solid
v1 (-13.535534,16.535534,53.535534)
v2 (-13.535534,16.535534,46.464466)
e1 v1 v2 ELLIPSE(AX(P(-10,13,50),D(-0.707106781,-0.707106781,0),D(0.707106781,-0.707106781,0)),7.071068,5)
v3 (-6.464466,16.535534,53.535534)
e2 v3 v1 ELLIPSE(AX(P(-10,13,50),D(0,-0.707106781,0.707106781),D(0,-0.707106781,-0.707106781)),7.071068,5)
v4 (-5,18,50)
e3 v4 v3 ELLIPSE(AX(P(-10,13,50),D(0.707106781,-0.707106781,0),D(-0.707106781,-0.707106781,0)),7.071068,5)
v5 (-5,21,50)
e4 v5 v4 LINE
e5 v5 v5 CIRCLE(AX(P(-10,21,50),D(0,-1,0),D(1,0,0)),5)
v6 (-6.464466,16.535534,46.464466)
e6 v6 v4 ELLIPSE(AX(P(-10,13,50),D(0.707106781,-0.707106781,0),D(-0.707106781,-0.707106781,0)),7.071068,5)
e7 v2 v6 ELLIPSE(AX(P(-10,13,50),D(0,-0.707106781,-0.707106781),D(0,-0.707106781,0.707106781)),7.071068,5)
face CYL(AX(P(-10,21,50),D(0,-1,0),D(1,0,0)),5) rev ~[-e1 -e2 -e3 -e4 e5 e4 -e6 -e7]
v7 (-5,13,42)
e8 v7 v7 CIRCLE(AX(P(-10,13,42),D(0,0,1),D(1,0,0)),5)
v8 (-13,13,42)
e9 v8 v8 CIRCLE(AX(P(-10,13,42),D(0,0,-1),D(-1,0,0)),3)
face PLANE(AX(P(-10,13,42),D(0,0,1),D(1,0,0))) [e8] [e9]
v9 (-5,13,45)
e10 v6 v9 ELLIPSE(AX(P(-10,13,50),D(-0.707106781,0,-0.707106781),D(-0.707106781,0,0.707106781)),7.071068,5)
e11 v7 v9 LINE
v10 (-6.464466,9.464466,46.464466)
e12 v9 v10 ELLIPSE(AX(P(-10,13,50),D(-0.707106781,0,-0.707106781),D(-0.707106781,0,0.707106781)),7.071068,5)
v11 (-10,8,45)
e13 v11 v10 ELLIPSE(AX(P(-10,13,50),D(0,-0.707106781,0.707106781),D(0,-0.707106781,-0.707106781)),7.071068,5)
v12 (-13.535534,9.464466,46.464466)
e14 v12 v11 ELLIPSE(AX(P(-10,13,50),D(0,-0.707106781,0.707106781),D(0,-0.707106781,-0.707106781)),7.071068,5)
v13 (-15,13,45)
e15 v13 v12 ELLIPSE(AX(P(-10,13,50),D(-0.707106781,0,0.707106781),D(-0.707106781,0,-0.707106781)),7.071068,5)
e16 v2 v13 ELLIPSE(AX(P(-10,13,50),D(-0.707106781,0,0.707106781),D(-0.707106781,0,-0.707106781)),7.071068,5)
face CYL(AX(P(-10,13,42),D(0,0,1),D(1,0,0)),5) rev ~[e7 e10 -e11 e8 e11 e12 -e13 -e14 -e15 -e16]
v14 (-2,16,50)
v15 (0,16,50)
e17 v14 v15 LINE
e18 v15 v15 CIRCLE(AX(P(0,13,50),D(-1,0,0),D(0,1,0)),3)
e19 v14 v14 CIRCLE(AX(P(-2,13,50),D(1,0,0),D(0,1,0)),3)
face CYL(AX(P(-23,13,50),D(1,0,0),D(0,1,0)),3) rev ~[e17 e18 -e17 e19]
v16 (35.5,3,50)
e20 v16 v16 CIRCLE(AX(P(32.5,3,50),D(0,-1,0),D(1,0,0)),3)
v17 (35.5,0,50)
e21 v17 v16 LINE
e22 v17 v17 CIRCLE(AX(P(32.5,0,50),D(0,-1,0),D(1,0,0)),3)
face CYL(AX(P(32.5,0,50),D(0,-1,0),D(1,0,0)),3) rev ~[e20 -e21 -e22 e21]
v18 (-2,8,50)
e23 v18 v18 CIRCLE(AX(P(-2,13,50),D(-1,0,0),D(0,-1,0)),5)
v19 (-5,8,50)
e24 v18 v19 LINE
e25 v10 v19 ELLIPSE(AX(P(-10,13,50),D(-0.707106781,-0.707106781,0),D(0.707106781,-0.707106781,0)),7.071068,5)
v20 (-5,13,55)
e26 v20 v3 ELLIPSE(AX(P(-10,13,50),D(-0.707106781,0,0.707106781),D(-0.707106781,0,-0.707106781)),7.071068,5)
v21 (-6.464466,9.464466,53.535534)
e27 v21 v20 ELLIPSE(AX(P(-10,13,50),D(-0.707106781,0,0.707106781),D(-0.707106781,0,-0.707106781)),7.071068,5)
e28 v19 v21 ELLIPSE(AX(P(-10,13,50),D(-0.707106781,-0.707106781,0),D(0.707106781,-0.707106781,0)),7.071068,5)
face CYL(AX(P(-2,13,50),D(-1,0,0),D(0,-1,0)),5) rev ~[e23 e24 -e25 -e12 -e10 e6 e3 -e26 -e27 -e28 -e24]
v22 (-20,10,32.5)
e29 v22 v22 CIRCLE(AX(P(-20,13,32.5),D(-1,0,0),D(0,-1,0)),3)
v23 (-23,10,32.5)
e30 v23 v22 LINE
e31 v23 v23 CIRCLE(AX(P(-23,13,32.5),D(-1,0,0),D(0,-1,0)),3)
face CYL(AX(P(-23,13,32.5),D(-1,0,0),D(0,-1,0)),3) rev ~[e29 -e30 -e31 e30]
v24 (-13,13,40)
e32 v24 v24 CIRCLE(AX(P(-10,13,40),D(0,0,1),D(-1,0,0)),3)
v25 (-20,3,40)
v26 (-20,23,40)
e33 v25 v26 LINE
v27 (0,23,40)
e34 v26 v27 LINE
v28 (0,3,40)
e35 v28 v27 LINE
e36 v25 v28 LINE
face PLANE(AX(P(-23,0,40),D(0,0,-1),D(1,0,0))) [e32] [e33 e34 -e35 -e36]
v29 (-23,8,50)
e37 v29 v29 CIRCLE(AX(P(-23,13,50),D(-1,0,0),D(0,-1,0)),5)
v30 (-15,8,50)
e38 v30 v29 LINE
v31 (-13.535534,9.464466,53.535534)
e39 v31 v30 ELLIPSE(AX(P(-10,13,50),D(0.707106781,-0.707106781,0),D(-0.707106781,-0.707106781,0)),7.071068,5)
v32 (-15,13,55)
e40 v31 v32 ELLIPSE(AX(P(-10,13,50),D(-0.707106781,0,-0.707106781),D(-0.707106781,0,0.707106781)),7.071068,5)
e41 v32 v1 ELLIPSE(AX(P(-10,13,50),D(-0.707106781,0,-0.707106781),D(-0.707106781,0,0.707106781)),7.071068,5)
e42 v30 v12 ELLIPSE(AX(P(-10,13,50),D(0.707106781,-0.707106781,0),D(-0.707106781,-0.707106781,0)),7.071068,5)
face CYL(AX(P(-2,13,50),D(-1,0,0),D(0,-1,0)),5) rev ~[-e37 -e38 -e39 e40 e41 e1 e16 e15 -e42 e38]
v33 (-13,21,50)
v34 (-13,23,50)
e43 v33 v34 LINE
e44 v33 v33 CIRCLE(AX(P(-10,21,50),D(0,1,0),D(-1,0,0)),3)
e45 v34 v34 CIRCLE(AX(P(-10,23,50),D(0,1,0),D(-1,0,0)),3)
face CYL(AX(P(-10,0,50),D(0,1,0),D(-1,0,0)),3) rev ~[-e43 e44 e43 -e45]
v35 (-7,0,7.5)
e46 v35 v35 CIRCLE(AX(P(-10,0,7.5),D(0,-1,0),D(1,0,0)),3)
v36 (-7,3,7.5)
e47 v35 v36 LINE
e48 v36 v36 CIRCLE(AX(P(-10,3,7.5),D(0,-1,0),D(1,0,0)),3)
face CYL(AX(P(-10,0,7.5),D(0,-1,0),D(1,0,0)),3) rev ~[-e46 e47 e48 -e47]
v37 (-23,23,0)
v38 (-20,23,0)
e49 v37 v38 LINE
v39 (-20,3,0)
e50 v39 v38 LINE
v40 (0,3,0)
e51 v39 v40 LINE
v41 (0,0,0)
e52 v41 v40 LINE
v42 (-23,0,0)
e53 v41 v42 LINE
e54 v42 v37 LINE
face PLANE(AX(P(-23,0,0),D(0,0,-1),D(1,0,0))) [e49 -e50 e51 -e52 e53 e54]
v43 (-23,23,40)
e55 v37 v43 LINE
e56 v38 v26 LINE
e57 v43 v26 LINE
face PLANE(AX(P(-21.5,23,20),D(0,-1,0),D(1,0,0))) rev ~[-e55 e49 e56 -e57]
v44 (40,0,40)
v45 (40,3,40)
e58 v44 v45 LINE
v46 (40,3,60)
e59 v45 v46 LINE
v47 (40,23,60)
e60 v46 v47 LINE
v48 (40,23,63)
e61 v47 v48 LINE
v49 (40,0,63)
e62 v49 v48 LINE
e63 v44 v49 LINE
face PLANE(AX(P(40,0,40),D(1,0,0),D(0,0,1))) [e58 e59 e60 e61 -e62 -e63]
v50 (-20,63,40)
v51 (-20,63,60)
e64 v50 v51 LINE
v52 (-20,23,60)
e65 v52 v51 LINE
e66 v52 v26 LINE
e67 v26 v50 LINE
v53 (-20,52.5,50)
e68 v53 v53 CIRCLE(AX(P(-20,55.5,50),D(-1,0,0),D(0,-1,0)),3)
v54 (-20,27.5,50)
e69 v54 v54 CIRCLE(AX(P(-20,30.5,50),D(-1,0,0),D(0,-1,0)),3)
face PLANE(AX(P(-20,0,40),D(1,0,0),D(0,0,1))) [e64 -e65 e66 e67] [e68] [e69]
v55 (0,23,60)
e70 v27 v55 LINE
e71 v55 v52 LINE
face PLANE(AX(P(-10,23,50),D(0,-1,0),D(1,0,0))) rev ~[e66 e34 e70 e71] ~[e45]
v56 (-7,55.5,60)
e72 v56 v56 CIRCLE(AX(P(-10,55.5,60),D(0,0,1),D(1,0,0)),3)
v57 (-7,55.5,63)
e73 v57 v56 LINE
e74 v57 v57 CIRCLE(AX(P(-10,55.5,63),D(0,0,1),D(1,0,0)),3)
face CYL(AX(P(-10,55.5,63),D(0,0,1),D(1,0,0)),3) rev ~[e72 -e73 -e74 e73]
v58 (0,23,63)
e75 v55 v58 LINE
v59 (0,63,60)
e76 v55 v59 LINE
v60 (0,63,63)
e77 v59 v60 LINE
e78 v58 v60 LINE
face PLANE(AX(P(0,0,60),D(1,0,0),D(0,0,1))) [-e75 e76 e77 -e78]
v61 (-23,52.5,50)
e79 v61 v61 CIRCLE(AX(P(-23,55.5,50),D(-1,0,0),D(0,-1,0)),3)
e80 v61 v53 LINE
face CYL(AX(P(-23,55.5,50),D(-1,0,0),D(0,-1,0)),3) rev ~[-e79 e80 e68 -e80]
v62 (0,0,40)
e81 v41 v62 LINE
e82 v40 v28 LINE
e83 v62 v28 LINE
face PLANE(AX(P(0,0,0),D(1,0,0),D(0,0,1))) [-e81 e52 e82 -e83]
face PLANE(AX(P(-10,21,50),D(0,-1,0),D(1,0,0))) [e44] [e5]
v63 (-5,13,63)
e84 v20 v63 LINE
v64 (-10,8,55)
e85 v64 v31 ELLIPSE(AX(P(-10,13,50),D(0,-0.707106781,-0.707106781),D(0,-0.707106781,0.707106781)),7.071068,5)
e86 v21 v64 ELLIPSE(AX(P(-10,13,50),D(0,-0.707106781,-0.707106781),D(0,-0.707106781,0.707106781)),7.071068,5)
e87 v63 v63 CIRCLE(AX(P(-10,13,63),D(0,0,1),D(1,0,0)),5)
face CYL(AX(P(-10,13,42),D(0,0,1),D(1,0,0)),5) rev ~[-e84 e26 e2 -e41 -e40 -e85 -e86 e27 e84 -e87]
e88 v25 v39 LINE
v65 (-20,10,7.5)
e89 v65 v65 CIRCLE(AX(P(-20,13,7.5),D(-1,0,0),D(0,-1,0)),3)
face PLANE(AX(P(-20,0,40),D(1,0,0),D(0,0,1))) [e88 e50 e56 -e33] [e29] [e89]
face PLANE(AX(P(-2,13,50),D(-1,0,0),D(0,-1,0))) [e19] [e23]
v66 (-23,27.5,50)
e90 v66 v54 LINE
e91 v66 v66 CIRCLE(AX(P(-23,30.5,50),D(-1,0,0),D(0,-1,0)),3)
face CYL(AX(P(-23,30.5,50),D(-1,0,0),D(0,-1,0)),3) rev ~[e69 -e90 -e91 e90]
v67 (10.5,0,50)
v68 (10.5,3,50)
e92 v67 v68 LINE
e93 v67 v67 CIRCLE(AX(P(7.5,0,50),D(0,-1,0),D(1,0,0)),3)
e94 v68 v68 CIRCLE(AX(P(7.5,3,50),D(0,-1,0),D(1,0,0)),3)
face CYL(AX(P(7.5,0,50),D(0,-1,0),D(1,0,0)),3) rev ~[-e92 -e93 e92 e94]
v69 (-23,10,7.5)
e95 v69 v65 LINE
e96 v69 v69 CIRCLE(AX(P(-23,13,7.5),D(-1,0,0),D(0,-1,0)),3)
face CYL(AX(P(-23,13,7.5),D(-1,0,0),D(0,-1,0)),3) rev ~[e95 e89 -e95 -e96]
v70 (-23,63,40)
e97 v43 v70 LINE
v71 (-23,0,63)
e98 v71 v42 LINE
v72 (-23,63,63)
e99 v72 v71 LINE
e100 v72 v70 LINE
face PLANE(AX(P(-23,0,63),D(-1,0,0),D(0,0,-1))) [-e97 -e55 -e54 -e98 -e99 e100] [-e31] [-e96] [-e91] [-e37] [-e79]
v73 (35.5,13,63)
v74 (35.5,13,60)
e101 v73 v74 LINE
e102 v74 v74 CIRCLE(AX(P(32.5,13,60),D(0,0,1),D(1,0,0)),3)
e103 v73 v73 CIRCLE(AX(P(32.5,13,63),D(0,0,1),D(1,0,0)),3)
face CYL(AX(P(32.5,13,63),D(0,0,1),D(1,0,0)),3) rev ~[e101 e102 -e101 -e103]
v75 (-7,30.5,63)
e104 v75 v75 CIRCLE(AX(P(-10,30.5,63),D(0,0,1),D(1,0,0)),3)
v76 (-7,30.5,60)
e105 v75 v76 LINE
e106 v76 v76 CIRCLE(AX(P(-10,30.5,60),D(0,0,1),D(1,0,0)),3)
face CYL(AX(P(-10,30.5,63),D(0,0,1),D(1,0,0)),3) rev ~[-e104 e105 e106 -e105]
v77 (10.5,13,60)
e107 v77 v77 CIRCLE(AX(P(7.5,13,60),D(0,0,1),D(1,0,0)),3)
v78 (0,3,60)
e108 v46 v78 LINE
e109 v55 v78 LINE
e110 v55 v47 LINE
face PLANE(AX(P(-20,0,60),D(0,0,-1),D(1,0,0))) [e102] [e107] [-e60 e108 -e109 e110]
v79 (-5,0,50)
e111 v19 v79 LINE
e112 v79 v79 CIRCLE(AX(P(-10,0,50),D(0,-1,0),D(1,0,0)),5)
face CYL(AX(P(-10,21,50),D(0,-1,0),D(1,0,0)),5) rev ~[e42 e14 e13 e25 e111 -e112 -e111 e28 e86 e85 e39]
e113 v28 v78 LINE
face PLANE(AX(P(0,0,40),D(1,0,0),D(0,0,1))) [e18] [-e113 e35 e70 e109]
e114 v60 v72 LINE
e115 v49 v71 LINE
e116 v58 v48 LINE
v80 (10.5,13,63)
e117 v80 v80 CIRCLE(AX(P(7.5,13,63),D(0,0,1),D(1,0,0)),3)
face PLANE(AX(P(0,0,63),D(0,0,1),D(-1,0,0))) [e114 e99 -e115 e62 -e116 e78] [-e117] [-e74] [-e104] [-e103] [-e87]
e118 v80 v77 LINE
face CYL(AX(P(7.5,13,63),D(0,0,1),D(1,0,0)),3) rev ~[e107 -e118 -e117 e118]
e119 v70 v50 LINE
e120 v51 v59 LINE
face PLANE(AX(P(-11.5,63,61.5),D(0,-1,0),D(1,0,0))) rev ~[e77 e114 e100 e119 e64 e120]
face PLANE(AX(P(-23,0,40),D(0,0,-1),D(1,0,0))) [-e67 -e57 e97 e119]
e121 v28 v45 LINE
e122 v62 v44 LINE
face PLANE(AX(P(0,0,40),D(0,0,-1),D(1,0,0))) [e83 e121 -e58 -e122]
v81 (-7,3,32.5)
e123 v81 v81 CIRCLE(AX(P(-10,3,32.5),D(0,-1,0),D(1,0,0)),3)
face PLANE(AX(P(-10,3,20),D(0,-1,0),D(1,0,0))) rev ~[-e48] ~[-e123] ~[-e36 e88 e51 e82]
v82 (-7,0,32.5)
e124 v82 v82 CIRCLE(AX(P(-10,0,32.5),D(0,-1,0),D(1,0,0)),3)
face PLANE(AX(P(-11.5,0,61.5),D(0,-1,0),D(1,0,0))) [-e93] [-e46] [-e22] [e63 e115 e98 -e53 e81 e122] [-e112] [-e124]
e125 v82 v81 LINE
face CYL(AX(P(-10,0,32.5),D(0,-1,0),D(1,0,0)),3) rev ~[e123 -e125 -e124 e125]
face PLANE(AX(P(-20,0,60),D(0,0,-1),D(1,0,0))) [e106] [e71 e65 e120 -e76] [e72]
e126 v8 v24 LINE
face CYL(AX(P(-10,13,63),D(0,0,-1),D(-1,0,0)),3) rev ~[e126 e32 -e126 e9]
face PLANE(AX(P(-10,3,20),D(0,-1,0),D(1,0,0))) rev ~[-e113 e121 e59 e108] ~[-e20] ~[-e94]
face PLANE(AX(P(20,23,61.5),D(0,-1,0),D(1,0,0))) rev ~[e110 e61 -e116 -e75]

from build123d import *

# Parameters (mm, degrees)
F0_W                 = 20
F0_H                 = 40
F0_R                 = 3
F0_H_2               = 20
F0_R_2               = 5
F0_W_2               = 40
F1_DEPTH             = 3
F0_W_3               = 3
F0_H_3               = 3
F2_DEPTH             = 23
F3_DEPTH             = 63
F4_R                 = 3
F4_R_2               = 5
F6_DEPTH             = 25
F5_R                 = 3
F5_R_2               = 5
F7_DEPTH             = 25
F8_DEPTH             = 23
F9_D                 = 6
F9_DEPTH             = 23
F9_CBORE_D           = 10
F9_CBORE_DEPTH       = 21
F9_TIP               = 1.8025818571
F9_ON_F5_D           = 6
F9_ON_F5_DEPTH       = 23
F9_ON_F5_CBORE_D     = 10
F9_ON_F5_CBORE_DEPTH = 21
F9_ON_F5_TIP         = 1.8025818571
F9_ON_F4_D           = 6
F9_ON_F4_DEPTH       = 23
F9_ON_F4_CBORE_D     = 10
F9_ON_F4_CBORE_DEPTH = 21
F9_ON_F4_TIP         = 1.8025818571


# Not quite as in the source:
# - a feature of the source that left no trace in its solid (it failed there, or was rolled back) is left out


with BuildPart() as f1:
    # F0 (on Front) → F1 (new body)
    with BuildSketch(Plane.XZ):
        with Locations((-10, 20)):
            Rectangle(F0_W, F0_H)
        with Locations((-10, 7.5)):
            Circle(F0_R, mode=Mode.SUBTRACT)
        with Locations((-10, 32.5)):
            Circle(F0_R, mode=Mode.SUBTRACT)
        with Locations((-10, 50)):
            Rectangle(F0_W, F0_H_2)
        with Locations((-10, 50)):
            Circle(F0_R_2, mode=Mode.SUBTRACT)
        with Locations((20, 50)):
            Rectangle(F0_W_2, F0_H_2)
        with Locations((7.5, 50)):
            Circle(F0_R, mode=Mode.SUBTRACT)
        with Locations((32.5, 50)):
            Circle(F0_R, mode=Mode.SUBTRACT)
    extrude(amount=-F1_DEPTH)

    # F0 (on Front) → F2 (join)
    with BuildSketch(Plane.XZ):
        with Locations((-21.5, 20)):
            Rectangle(F0_W_3, F0_H)
        with Locations((20, 61.5)):
            Rectangle(F0_W_2, F0_H_3)
    extrude(amount=-F2_DEPTH)

    # F0 (on Front) → F3 (join)
    with BuildSketch(Plane.XZ):
        Polygon((-20, 60), (0, 60), (0, 63), (-23, 63), (-23, 60), align=None)
        with Locations((-21.5, 50)):
            Rectangle(F0_W_3, F0_H_2)
    extrude(amount=-F3_DEPTH)

    # F4 (on face) → F6 (cut)
    with BuildSketch(Plane.XY.offset(63)):
        with Locations((-10, 55.5)):
            Circle(F4_R)
        with Locations((-10, 30.5)):
            Circle(F4_R)
        with Locations((-10, 13)):
            Circle(F4_R_2)
        with Locations((7.5, 13)):
            Circle(F4_R)
        with Locations((32.5, 13)):
            Circle(F4_R)
    extrude(amount=-F6_DEPTH, mode=Mode.SUBTRACT)

    # F5 (on face) → F7 (cut)
    with BuildSketch(Plane(origin=(-23, 0, 0), x_dir=(0, -1, 0), z_dir=(-1, 0, 0))):
        with Locations((-55.5, 50)):
            Circle(F5_R)
        with Locations((-30.5, 50)):
            Circle(F5_R)
        with Locations((-13, 50)):
            Circle(F5_R_2)
        with Locations((-13, 7.5)):
            Circle(F5_R)
        with Locations((-13, 32.5)):
            Circle(F5_R)
    extrude(amount=-F7_DEPTH, mode=Mode.SUBTRACT)

    # F0 (on Front) → F8 (join)
    with BuildSketch(Plane.XZ):
        with Locations((-10, 50)):
            Rectangle(F0_W, F0_H_2)
        with Locations((-10, 50)):
            Circle(F0_R_2, mode=Mode.SUBTRACT)
        Polygon((-20, 60), (0, 60), (0, 63), (-23, 63), (-23, 60), align=None)
        with Locations((-21.5, 50)):
            Rectangle(F0_W_3, F0_H_2)
        with Locations((-10, 50)):
            Circle(F0_R_2)
    extrude(amount=-F8_DEPTH)

    # F9
    with Locations(Plane.XZ):
        with Locations((-10, 50)):
            CounterBoreHole(F9_D / 2, F9_CBORE_D / 2, F9_CBORE_DEPTH, depth=F9_DEPTH)
            with Locations((0, 0, -(F9_DEPTH + F9_TIP / 2))):  # 118° drill point
                Cone(0, F9_D / 2, F9_TIP, mode=Mode.SUBTRACT)

    # F9 on F5
    with Locations(Plane(origin=(-23, 0, 0), x_dir=(0, -1, 0), z_dir=(-1, 0, 0))):
        with Locations((-13, 50)):
            CounterBoreHole(F9_ON_F5_D / 2, F9_ON_F5_CBORE_D / 2, F9_ON_F5_CBORE_DEPTH, depth=F9_ON_F5_DEPTH)
            with Locations((0, 0, -(F9_ON_F5_DEPTH + F9_ON_F5_TIP / 2))):  # 118° drill point
                Cone(0, F9_ON_F5_D / 2, F9_ON_F5_TIP, mode=Mode.SUBTRACT)

    # F9 on F4
    with Locations(Plane.XY.offset(63)):
        with Locations((-10, 13)):
            CounterBoreHole(F9_ON_F4_D / 2, F9_ON_F4_CBORE_D / 2, F9_ON_F4_CBORE_DEPTH, depth=F9_ON_F4_DEPTH)
            with Locations((0, 0, -(F9_ON_F4_DEPTH + F9_ON_F4_TIP / 2))):  # 118° drill point
                Cone(0, F9_ON_F4_D / 2, F9_ON_F4_TIP, mode=Mode.SUBTRACT)


solid = f1.part
